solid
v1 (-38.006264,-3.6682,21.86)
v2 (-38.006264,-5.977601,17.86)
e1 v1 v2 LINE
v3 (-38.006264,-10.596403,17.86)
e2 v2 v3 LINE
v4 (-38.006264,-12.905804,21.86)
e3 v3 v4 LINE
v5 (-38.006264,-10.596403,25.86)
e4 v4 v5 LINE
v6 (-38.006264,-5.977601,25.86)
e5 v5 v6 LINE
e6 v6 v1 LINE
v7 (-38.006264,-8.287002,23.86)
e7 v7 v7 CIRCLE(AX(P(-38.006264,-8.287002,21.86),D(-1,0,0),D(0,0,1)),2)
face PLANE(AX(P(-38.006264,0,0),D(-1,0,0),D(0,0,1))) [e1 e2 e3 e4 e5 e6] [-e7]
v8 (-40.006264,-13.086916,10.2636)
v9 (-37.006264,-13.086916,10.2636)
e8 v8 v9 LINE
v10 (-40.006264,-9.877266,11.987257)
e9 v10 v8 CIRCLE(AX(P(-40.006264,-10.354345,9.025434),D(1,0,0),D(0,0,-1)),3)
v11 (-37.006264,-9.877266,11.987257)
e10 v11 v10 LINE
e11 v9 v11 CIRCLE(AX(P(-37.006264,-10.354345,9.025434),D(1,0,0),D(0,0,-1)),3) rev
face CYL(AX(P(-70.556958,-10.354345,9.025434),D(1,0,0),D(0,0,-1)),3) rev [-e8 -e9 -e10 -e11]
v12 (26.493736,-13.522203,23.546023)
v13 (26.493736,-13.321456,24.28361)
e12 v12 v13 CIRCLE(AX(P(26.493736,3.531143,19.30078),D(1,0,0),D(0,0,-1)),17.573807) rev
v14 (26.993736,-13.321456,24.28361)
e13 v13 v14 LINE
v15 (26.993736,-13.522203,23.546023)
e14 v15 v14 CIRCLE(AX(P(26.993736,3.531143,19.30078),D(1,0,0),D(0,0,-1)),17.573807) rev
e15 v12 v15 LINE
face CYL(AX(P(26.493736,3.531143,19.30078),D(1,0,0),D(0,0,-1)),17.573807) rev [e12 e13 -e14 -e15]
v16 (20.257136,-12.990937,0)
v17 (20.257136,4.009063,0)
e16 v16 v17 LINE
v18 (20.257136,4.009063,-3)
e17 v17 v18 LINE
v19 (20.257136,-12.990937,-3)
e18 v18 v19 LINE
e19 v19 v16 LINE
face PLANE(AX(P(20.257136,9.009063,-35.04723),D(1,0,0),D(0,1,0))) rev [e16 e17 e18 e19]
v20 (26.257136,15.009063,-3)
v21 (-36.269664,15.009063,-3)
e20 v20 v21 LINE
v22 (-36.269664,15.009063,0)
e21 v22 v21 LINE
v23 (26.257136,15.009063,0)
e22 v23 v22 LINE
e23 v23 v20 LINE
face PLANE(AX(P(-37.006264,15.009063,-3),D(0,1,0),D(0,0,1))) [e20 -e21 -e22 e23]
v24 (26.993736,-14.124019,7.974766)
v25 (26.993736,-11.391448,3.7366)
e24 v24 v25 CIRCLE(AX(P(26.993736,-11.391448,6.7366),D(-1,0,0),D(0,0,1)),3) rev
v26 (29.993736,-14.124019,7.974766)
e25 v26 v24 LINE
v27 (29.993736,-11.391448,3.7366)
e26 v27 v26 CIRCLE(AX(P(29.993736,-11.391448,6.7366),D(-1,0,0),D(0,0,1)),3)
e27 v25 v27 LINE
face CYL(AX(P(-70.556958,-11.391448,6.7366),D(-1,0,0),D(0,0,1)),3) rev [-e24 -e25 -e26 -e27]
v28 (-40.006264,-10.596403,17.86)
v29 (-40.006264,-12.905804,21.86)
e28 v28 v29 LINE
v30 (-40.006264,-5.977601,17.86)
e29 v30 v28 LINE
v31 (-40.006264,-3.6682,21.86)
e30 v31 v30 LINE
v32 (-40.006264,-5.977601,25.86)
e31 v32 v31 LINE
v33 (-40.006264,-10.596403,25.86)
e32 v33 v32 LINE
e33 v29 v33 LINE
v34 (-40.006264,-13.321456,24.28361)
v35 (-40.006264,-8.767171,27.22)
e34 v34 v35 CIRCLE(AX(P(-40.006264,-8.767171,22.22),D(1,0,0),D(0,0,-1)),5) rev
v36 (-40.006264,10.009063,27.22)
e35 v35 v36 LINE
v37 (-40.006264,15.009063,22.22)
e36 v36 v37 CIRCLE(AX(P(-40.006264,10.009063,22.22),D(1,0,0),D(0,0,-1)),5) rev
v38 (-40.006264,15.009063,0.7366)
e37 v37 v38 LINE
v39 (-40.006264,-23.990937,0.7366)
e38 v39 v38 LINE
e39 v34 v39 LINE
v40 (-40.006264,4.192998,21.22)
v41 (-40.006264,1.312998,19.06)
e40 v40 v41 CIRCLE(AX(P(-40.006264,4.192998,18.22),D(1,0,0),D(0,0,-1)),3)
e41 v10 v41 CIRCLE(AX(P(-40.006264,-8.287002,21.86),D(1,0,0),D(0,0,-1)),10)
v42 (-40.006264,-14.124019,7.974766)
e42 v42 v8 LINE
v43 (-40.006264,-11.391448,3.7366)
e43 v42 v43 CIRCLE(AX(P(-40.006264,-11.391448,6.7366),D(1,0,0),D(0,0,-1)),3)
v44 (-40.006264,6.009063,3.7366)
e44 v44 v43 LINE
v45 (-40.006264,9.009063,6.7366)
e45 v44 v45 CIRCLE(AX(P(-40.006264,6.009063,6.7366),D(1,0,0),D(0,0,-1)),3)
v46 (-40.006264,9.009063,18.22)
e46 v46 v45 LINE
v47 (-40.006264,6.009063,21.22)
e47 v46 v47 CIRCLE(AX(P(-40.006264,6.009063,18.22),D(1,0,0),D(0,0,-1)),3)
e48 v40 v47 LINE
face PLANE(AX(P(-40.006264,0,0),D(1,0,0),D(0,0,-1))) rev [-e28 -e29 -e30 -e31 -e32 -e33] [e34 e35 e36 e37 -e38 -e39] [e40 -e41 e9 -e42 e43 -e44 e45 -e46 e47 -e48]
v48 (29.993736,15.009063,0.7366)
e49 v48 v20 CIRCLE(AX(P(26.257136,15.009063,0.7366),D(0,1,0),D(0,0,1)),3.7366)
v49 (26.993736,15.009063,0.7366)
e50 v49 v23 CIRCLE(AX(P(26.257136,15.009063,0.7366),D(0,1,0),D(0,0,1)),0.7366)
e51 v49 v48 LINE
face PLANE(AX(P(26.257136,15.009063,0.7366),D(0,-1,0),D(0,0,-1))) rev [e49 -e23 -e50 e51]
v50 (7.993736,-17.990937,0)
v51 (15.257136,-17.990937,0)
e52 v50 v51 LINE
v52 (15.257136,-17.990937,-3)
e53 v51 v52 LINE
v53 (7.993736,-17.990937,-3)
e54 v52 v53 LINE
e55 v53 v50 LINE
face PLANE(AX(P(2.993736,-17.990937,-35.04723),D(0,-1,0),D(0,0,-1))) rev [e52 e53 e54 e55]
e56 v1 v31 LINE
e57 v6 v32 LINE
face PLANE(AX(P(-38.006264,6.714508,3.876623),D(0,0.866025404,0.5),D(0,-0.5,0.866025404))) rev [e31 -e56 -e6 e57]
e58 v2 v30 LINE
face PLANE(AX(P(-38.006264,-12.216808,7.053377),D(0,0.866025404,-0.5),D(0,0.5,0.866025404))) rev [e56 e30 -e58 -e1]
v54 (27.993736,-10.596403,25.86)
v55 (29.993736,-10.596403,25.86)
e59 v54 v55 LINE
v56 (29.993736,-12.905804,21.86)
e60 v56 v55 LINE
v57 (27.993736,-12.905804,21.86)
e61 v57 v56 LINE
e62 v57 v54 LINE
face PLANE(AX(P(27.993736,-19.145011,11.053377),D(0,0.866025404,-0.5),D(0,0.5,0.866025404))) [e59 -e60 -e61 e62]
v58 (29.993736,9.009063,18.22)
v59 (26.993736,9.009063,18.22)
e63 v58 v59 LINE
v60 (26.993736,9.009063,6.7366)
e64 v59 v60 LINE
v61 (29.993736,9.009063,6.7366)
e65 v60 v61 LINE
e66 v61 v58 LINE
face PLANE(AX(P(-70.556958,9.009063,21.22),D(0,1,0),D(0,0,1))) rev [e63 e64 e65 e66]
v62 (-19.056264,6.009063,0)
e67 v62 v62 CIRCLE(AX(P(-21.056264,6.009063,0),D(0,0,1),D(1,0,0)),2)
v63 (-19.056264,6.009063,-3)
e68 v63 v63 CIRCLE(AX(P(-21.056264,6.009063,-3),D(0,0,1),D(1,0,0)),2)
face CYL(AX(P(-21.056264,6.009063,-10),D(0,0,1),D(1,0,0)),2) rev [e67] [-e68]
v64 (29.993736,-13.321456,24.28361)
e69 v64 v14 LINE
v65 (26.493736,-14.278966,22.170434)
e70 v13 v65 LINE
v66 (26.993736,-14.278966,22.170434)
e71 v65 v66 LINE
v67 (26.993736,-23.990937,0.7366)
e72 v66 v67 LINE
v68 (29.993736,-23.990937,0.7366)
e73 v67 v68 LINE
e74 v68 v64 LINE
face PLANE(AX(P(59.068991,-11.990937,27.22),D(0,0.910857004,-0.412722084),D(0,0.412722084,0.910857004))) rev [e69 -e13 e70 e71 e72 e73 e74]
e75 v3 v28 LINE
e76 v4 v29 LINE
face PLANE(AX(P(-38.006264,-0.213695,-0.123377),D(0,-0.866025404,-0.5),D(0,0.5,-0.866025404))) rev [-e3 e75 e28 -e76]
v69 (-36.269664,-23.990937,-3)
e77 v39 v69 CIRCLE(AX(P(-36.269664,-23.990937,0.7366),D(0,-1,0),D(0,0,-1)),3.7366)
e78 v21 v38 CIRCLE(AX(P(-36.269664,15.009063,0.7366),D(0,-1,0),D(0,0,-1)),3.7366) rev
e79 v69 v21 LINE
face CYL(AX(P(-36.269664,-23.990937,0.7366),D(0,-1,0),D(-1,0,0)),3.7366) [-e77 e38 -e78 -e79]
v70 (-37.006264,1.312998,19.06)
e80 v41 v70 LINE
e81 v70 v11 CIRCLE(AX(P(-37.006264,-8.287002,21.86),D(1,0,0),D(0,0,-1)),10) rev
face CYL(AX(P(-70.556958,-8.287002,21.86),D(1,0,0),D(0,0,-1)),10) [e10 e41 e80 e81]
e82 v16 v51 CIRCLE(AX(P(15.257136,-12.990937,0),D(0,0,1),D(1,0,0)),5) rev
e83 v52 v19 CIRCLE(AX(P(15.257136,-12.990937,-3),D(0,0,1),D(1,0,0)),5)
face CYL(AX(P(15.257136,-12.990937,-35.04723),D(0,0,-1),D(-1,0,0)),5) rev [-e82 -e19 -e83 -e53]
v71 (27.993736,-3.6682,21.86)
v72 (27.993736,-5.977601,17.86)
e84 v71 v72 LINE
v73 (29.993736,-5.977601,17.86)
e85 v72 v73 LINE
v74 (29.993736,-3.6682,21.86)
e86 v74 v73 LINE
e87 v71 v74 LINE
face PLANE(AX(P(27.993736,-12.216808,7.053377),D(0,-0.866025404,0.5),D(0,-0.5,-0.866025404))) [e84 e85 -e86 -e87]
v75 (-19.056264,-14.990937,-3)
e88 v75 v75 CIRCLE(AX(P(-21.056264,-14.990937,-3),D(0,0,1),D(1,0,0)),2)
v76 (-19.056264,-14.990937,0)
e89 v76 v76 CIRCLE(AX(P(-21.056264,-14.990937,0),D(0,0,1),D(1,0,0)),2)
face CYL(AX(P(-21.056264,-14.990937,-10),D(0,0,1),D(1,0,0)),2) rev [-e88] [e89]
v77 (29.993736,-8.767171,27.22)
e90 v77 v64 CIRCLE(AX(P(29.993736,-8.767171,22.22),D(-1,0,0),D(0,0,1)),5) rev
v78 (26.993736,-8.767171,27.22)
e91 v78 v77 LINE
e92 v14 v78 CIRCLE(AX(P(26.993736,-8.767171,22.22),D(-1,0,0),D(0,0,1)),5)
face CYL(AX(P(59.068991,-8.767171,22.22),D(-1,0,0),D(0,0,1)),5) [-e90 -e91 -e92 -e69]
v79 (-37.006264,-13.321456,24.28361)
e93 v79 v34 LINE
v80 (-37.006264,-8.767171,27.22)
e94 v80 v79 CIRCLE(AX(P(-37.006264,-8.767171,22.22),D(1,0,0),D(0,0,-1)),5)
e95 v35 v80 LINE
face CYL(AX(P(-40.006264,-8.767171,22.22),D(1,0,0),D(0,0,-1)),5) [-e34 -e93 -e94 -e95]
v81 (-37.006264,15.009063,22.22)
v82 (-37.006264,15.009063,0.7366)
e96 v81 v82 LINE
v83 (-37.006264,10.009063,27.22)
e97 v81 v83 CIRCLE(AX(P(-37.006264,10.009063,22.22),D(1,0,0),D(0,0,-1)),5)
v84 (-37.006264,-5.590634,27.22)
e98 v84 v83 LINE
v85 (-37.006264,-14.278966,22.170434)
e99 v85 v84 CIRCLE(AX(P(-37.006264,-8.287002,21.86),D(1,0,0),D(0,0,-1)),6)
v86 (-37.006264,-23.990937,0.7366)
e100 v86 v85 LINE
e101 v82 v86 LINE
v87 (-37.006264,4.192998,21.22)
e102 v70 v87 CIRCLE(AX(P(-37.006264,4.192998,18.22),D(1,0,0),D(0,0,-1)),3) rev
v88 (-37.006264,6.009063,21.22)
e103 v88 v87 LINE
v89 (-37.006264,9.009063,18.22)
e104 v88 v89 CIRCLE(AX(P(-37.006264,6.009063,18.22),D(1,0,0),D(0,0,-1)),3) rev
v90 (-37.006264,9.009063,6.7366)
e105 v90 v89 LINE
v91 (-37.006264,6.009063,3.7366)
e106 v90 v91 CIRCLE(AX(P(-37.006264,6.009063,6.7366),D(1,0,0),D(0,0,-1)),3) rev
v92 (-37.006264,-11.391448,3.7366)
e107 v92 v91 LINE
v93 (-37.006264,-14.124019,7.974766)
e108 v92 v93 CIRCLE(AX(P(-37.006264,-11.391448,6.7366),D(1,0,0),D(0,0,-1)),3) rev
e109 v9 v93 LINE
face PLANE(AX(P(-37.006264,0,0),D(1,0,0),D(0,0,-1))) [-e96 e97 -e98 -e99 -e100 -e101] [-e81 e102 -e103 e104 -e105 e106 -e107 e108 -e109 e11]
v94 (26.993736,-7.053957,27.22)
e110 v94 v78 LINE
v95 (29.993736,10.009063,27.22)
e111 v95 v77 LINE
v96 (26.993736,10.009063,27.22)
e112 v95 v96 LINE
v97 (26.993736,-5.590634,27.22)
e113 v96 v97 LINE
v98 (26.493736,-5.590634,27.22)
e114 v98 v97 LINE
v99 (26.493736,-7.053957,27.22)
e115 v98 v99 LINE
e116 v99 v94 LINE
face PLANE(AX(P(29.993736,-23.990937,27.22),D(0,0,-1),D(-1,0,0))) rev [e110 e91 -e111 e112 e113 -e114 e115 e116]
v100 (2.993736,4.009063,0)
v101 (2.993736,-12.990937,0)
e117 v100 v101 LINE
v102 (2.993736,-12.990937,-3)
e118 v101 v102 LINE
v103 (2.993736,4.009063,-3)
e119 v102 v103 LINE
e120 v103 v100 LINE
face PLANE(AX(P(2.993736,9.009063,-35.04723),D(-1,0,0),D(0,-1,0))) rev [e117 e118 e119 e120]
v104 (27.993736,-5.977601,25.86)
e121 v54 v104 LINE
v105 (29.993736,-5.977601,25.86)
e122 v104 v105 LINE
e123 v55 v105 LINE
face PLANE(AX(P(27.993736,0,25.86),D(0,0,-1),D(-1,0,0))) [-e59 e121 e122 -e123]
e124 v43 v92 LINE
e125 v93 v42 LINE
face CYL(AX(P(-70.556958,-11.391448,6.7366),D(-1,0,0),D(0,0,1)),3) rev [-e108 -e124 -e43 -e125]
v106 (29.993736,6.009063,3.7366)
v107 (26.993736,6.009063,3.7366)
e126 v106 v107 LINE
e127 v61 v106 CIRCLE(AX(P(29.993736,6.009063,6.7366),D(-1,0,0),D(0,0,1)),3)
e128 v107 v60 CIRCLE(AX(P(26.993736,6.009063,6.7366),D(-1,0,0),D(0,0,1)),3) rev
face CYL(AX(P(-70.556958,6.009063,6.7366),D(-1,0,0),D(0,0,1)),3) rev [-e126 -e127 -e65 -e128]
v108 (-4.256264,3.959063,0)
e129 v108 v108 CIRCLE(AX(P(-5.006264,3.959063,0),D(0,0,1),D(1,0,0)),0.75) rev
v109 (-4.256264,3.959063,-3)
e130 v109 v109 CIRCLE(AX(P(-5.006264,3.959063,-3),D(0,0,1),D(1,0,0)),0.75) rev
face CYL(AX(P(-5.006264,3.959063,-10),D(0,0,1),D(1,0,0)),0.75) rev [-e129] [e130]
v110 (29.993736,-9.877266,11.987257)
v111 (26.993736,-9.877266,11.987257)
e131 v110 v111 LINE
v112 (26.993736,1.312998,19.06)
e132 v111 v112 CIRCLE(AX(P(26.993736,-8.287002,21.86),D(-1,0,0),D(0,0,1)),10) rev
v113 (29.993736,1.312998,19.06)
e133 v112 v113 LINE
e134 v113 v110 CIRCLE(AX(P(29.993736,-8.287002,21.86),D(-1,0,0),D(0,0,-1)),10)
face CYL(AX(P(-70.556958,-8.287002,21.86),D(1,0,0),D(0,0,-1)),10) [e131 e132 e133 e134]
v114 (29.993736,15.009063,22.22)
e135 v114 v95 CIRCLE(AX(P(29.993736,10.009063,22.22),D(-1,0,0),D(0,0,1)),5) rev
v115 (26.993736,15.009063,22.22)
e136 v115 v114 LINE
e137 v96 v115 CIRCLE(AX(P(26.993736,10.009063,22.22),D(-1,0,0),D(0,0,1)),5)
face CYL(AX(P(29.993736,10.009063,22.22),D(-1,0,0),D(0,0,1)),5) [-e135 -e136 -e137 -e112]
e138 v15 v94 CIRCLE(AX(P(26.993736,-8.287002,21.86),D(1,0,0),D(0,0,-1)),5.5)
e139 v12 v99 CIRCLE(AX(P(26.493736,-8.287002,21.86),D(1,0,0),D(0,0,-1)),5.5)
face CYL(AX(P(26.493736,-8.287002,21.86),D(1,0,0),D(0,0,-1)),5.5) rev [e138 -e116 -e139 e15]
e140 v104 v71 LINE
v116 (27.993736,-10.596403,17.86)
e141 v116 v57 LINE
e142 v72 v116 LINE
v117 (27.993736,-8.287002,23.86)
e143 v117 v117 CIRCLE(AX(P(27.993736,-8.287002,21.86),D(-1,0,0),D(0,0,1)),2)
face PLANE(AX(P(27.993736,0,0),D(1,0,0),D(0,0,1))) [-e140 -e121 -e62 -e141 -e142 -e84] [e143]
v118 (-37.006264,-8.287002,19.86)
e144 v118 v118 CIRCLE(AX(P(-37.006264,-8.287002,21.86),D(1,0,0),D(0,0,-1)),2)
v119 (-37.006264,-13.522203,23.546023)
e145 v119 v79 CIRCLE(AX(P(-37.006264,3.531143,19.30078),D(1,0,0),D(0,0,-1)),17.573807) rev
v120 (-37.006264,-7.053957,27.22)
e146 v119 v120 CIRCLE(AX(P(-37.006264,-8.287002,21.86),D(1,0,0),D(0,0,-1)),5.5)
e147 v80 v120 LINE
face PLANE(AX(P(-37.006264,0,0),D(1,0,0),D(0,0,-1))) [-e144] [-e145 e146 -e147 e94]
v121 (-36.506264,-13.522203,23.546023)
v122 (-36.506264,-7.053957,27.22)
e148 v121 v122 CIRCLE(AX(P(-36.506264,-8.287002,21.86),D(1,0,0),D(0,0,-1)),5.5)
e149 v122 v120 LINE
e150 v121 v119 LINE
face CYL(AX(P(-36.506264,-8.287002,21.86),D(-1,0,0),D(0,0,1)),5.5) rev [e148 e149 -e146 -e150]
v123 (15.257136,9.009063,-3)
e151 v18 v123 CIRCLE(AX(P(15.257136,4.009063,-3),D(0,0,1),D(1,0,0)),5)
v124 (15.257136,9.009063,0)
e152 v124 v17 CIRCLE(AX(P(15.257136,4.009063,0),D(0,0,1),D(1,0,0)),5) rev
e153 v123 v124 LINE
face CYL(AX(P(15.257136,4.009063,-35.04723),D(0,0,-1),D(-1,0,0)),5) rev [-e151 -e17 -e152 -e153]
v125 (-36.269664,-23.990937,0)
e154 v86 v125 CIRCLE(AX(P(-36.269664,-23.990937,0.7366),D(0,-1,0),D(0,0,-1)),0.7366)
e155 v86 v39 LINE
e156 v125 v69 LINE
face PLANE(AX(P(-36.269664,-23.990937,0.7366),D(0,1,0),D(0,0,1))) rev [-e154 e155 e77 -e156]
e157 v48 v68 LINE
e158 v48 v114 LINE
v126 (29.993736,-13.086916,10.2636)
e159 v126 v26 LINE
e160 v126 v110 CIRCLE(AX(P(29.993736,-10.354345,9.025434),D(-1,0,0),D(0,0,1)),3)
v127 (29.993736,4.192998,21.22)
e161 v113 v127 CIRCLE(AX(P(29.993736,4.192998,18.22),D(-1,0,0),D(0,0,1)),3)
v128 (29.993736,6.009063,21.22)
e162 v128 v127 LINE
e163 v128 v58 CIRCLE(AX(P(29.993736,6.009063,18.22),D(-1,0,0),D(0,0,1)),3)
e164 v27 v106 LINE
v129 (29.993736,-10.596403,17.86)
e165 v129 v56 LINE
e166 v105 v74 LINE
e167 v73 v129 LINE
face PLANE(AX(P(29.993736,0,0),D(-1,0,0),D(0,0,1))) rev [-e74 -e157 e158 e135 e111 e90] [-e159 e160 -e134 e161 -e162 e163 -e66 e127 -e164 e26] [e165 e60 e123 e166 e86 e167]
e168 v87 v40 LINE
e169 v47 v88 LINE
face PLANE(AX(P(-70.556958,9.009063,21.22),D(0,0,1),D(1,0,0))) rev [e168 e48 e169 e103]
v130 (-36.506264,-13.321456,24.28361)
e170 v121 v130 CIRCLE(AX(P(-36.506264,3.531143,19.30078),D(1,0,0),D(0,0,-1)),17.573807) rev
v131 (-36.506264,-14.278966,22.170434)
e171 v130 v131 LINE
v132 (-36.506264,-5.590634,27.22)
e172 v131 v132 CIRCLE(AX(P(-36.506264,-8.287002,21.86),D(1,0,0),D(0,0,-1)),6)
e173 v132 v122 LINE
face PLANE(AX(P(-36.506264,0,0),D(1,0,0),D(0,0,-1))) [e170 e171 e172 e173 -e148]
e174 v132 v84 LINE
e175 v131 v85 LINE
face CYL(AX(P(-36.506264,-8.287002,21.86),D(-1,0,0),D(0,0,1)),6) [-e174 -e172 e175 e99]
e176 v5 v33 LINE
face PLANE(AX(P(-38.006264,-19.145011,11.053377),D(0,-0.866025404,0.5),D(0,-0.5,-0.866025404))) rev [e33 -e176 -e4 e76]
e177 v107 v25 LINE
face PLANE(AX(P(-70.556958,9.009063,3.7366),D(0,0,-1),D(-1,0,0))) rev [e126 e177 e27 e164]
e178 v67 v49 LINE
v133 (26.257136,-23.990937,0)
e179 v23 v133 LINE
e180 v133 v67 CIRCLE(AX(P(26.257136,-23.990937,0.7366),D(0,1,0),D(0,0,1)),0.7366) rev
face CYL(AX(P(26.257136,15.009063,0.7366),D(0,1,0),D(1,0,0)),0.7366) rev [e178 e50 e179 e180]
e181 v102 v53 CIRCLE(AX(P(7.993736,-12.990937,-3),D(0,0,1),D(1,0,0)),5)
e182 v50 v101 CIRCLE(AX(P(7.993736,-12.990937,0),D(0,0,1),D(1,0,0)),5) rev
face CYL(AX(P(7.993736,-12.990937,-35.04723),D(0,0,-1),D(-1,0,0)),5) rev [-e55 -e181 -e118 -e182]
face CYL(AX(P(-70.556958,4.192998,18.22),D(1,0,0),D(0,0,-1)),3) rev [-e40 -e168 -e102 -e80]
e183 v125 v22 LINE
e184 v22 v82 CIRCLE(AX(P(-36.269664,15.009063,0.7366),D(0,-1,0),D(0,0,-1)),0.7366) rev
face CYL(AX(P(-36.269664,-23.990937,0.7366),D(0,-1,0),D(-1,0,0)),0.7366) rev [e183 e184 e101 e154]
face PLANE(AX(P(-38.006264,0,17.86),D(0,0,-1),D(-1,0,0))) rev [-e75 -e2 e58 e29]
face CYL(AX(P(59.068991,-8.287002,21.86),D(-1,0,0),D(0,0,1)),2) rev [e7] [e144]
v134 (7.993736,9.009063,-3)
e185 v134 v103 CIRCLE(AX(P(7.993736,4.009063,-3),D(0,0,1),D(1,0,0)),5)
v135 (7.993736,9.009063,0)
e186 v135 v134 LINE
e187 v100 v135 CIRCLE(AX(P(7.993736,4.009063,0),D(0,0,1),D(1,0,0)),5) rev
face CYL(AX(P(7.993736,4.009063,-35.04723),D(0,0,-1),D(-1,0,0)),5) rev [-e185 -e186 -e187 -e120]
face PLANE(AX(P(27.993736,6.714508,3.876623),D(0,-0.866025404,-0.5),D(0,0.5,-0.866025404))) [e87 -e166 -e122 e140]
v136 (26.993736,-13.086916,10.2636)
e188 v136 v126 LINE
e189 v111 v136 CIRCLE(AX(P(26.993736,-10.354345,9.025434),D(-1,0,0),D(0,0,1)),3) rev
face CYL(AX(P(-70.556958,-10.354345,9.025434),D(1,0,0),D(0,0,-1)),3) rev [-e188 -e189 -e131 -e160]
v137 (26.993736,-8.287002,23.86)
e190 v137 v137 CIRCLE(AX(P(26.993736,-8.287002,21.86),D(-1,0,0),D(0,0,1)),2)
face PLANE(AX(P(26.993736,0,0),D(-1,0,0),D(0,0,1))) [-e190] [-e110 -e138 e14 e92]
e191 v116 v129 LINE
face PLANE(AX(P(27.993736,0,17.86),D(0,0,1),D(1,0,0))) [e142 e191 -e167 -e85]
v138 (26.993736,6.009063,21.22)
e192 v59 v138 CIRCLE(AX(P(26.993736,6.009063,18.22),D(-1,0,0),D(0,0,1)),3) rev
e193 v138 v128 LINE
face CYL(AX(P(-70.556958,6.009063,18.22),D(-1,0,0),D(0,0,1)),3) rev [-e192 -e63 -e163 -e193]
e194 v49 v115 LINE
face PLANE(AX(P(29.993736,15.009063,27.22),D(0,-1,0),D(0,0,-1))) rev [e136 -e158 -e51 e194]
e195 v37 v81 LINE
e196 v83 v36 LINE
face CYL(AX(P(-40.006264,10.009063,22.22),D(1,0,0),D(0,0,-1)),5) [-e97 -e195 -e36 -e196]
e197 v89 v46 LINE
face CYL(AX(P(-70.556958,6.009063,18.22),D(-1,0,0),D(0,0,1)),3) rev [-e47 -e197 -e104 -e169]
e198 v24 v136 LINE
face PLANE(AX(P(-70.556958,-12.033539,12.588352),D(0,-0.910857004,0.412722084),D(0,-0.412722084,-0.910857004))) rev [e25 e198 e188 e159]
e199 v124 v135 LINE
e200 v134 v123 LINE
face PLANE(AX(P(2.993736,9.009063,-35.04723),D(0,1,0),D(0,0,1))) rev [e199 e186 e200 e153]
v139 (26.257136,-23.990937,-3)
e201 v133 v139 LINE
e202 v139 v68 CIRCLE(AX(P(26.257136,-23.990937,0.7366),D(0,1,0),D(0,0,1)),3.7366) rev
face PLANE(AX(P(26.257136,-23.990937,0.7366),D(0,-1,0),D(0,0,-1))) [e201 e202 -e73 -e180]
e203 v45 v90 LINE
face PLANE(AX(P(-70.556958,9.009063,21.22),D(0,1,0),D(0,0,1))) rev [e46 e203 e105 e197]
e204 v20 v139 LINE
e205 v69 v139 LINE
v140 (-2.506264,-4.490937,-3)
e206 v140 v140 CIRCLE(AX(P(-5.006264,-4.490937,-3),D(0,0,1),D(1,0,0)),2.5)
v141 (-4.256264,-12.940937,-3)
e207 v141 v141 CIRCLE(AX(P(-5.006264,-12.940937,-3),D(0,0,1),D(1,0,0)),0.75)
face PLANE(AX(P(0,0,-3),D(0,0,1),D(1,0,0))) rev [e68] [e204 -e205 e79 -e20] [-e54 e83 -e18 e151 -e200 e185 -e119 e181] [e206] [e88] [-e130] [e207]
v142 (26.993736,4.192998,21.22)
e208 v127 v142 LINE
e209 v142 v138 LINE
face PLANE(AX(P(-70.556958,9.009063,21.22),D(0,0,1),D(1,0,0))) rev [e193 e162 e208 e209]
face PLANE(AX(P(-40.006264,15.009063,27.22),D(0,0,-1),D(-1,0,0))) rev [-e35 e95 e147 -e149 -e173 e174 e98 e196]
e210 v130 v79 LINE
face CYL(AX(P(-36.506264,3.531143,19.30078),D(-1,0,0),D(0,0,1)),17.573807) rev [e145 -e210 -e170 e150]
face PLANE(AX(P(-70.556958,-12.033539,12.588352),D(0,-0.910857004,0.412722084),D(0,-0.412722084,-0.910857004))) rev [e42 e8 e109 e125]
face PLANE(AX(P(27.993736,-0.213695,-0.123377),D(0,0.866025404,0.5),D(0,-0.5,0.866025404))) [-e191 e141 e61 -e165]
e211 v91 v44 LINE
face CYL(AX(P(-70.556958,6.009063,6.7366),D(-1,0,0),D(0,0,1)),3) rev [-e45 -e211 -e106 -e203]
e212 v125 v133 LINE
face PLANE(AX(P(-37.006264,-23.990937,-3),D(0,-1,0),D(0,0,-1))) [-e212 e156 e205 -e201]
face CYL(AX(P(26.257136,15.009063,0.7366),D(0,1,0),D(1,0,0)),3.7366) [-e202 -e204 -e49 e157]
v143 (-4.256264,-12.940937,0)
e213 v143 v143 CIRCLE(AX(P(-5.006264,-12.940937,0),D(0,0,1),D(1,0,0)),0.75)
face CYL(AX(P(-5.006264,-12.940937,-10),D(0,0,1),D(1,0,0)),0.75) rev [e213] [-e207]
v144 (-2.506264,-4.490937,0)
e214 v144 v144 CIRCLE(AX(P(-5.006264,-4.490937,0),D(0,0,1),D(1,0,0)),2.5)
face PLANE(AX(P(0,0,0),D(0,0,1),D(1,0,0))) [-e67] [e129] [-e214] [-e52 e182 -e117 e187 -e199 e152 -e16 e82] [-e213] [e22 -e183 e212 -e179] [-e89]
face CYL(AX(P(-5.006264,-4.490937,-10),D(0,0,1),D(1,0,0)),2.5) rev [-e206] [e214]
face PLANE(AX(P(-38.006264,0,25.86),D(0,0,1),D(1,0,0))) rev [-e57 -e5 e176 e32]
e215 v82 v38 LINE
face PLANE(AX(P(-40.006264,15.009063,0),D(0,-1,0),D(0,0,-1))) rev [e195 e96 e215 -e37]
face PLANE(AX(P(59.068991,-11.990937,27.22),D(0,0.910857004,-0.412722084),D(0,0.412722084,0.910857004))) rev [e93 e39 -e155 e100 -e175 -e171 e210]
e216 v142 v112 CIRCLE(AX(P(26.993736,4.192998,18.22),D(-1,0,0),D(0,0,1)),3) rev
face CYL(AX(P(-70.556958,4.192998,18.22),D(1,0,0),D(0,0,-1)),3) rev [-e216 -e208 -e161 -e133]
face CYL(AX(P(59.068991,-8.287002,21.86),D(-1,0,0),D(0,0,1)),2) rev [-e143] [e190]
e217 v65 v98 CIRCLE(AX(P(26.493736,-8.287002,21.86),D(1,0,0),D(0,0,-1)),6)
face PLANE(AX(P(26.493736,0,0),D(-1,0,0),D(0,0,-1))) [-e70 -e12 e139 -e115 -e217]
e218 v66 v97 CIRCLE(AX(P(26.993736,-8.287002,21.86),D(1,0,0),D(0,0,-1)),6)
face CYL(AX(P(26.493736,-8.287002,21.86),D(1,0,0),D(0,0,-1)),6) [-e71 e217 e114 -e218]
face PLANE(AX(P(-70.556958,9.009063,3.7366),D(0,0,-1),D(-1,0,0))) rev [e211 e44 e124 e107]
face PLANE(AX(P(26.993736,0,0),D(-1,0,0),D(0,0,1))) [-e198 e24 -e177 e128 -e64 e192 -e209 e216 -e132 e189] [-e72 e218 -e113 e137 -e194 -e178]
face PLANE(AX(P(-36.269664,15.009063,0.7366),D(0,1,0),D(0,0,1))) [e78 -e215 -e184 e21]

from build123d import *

# Parameters (mm, degrees)
ESBO_O1_W                        = 64
ESBO_O1_H                        = 39
FLANGE_BASE1_DEPTH               = 3
ESBO_O6_R                        = 2
ESBO_O6_R_2                      = 2.5
ESBO_O6_R_3                      = 0.75
CORTE_EXTRUS_O1_DEPTH            = 10
ARESTA_FLANGE1_STRIP_W           = 13.4732
ARESTA_FLANGE1_STRIP_H           = 3
ARESTA_FLANGE1_STRIP_CUT_DEPTH   = 39
ARESTA_FLANGE1_STRIP_2_W         = 13.4732
ARESTA_FLANGE1_STRIP_2_H         = 3
ARESTA_FLANGE1_STRIP_CUT_2_DEPTH = 39
ARESTA_FLANGE1_DEPTH             = 39
ARESTA_FLANGE1_BEND_DEPTH        = 39
CORTE_EXTRUS_O2_REACH            = 80.845
ESBO_O13_R                       = 2
FILETE1_R                        = 5
ESBO_O13_3_R                     = 2
CUT_EXTRUDE1_DEPTH               = 2
BOSS_EXTRUDE1_DEPTH              = 0.5
SKETCH15_W                       = 17.2634
SKETCH15_H                       = 27
CUT_EXTRUDE2_DEPTH               = 3
FILLET1_R                        = 5
CUT_EXTRUDE3_START               = -70
CUT_EXTRUDE3_DEPTH               = 70
FILLET2_R                        = 3


# Sheet-metal steps are written as plain solids
with BuildPart() as part:
    # Esboço1 → Flange-base1 (new body)
    with BuildSketch(Plane.XY):
        with Locations((-5.006264217, -4.490936556)):
            Rectangle(ESBO_O1_W, ESBO_O1_H)
    extrude(amount=-FLANGE_BASE1_DEPTH)

    # Esboço6 → Corte-extrusão1 (cut)
    with BuildSketch(Plane.XY):
        with Locations((-21.056264217, 6.009063444)):
            Circle(ESBO_O6_R)
        with Locations((-21.056264217, -14.990936556)):
            Circle(ESBO_O6_R)
        with Locations((-5.006264217, -4.490936556)):
            Circle(ESBO_O6_R_2)
        with Locations((-5.006264217, -12.940936556)):
            Circle(ESBO_O6_R_3)
        with Locations((-5.006264217, 3.959063444)):
            Circle(ESBO_O6_R_3)
    extrude(amount=-CORTE_EXTRUS_O1_DEPTH, mode=Mode.SUBTRACT)

    # Aresta-Flange1 strip (across the edge) → Aresta-Flange1 strip cut (cut)
    with BuildSketch(Plane(origin=(26.993735783, -23.990936556, 0), x_dir=(-1, 0, 0), z_dir=(0, 1, 0))):
        with Locations((-6, -1.5)):
            Rectangle(ARESTA_FLANGE1_STRIP_W, ARESTA_FLANGE1_STRIP_H)
    extrude(amount=ARESTA_FLANGE1_STRIP_CUT_DEPTH, mode=Mode.SUBTRACT)

    # Aresta-Flange1 strip 2 (across the edge) → Aresta-Flange1 strip cut 2 (cut)
    with BuildSketch(Plane(origin=(-37.006264217, 15.009063444, 0), x_dir=(1, 0, 0), z_dir=(0, -1, 0))):
        with Locations((-6, -1.5)):
            Rectangle(ARESTA_FLANGE1_STRIP_2_W, ARESTA_FLANGE1_STRIP_2_H)
    extrude(amount=ARESTA_FLANGE1_STRIP_CUT_2_DEPTH, mode=Mode.SUBTRACT)

    # Aresta-Flange1 section (across the edge) → Aresta-Flange1 (add)
    with BuildSketch(Plane(origin=(26.993735783, -23.990936556, 0), x_dir=(-1, 0, 0), z_dir=(0, 1, 0))):
        with BuildLine():
            Line((-3, 0.7366), (-3, 27.22))
            Line((-3, 27.22), (0, 27.22))
            Line((0, 27.22), (0, 0.7366))
            ThreePointArc((0, 0.7366), (0.215745145, 0.215745145), (0.7366, 0))
            Line((0.7366, 0), (0.7366, -3))
            ThreePointArc((0.7366, -3), (-1.905575199, -1.905575199), (-3, 0.7366))
        make_face()
    extrude(amount=ARESTA_FLANGE1_DEPTH)

    # Aresta-Flange1 section 2 (across the edge) → Aresta-Flange1 bend (add)
    with BuildSketch(Plane(origin=(-37.006264217, 15.009063444, 0), x_dir=(1, 0, 0), z_dir=(0, -1, 0))):
        with BuildLine():
            Line((-3, 0.7366), (-3, 27.22))
            Line((-3, 27.22), (0, 27.22))
            Line((0, 27.22), (0, 0.7366))
            ThreePointArc((0, 0.7366), (0.215745145, 0.215745145), (0.7366, 0))
            Line((0.7366, 0), (0.7366, -3))
            ThreePointArc((0.7366, -3), (-1.905575199, -1.905575199), (-3, 0.7366))
        make_face()
    extrude(amount=ARESTA_FLANGE1_BEND_DEPTH)

    # Corte-extrusão2: up to this face of the body (flat: up to its plane)
    corte_extrus_o2_end = Plane(part.part.faces().sort_by_distance((29.993735783, -4.490936556, 13.9783))[0])
    # Esboço13 → Corte-extrusão2 (cut, up to the picked face)
    with BuildSketch(Plane.ZY.offset(40.006264217), mode=Mode.PRIVATE) as corte_extrus_o2_sk1:
        with Locations((21.86, -8.287001978)):
            Circle(ESBO_O13_R)
    corte_extrus_o2_tool1 = split(extrude(corte_extrus_o2_sk1.sketch, amount=-CORTE_EXTRUS_O2_REACH, mode=Mode.PRIVATE), bisect_by=corte_extrus_o2_end, keep=Keep.BOTH, mode=Mode.PRIVATE)
    # Esboço13 → Corte-extrusão2 (cut, up to the picked face)
    with BuildSketch(Plane.ZY.offset(40.006264217), mode=Mode.PRIVATE) as corte_extrus_o2_sk2:
        Polygon((27.22, -11.990936556), (0.7366, -23.990936556), (27.22, -23.990936556), align=None)
    corte_extrus_o2_tool2 = split(extrude(corte_extrus_o2_sk2.sketch, amount=-CORTE_EXTRUS_O2_REACH, mode=Mode.PRIVATE), bisect_by=corte_extrus_o2_end, keep=Keep.BOTH, mode=Mode.PRIVATE)
    add(corte_extrus_o2_tool1.solids().sort_by(Axis((-40.006264, -8.287002, 21.86), (1, 0, 0)))[0], mode=Mode.SUBTRACT)
    add(corte_extrus_o2_tool2.solids().sort_by(Axis((-40.006264, -19.990937, 18.3922), (1, 0, 0)))[0], mode=Mode.SUBTRACT)

    # Filete1
    filete1_edges = [part.edges().sort_by_distance(p)[0] for p in [
        (-38.506264217, -11.990936556, 27.22),
        (28.493735783, -11.990936556, 27.22),
        (28.493735783, 15.009063444, 27.22),
        (-38.506264217, 15.009063444, 27.22),
    ]]
    fillet(filete1_edges, radius=FILETE1_R)

    # Esboço13<3> → Cut-Extrude1 (cut)
    with BuildSketch(Plane.ZY.offset(40.006264217)):
        Polygon((21.86, -3.668199824), (17.86, -5.977600901), (17.86, -10.596403054), (21.86, -12.905804131), (25.86, -10.596403054), (25.86, -5.977600901), align=None)
        with Locations((21.86, -8.287001978)):
            Circle(ESBO_O13_3_R, mode=Mode.SUBTRACT)
    cut_extrude1 = extrude(amount=-CUT_EXTRUDE1_DEPTH, mode=Mode.SUBTRACT)

    # Sketch7 → Boss-Extrude1 (add)
    with BuildSketch(Plane(origin=(-37.006264217, 0, 0), x_dir=(0, 0, -1), z_dir=(1, 0, 0))):
        with BuildLine():
            ThreePointArc((-23.546022833, -13.522202738), (-23.915908256, -13.425840182), (-24.283610421, -13.32145586))
            Line((-24.283610421, -13.32145586), (-22.170433783, -14.278965835))
            ThreePointArc((-22.170433783, -14.278965835), (-16.672492687, -5.272077786), (-27.22, -5.59063405))
            Line((-27.22, -5.59063405), (-27.22, -7.053956966))
            ThreePointArc((-27.22, -7.053956966), (-17.36732716, -5.11432318), (-22.490825712, -13.750705751))
            ThreePointArc((-22.490825712, -13.750705751), (-23.024044759, -13.66240892), (-23.546022833, -13.522202738))
        make_face()
    boss_extrude1 = extrude(amount=BOSS_EXTRUDE1_DEPTH)

    # Mirror1: Cut-Extrude1, Boss-Extrude1 across plane
    add(cut_extrude1.mirror(Plane.ZY.offset(5.006264217)), mode=Mode.SUBTRACT)
    add(boss_extrude1.mirror(Plane.ZY.offset(5.006264217)))

    # Sketch15 → Cut-Extrude2 (cut)
    with BuildSketch(Plane.XY):
        with Locations((11.625435783, -4.490936556)):
            Rectangle(SKETCH15_W, SKETCH15_H)
    extrude(amount=-CUT_EXTRUDE2_DEPTH, mode=Mode.SUBTRACT)

    # Fillet1
    fillet1_edges = [part.edges().sort_by_distance(p)[0] for p in [
        (2.993735783, -17.990936556, -1.5),
        (2.993735783, 9.009063444, -1.5),
        (20.257135783, 9.009063444, -1.5),
        (20.257135783, -17.990936556, -1.5),
    ]]
    fillet(fillet1_edges, radius=FILLET1_R)

    # Sketch16 → Cut-Extrude3 (cut)
    with BuildSketch(Plane(origin=(29.993735783, 0, 0), x_dir=(0, 0, -1), z_dir=(1, 0, 0)).offset(CUT_EXTRUDE3_START)):
        with BuildLine():
            Line((-21.22, 9.009063444), (-3.7366, 9.009063444))
            Line((-3.7366, 9.009063444), (-3.7366, -16.044391464))
            Line((-3.7366, -16.044391464), (-12.588351652, -12.033538634))
            ThreePointArc((-12.588351652, -12.033538634), (-13.394705743, -2.963582668), (-21.22, 1.692497008))
            Line((-21.22, 1.692497008), (-21.22, 9.009063444))
        make_face()
    extrude(amount=CUT_EXTRUDE3_DEPTH, mode=Mode.SUBTRACT)

    # Fillet2
    fillet2_edges = [part.edges().sort_by_distance(p)[0] for p in [
        (28.493735783, 1.692497008, 21.22),
        (28.493735783, 9.009063444, 21.22),
        (28.493735783, 9.009063444, 3.7366),
        (28.493735783, -16.044391464, 3.7366),
        (28.493735783, -12.033538634, 12.588351652),
        (-38.506264217, 1.692497008, 21.22),
        (-38.506264217, 9.009063444, 21.22),
        (-38.506264217, 9.009063444, 3.7366),
        (-38.506264217, -16.044391464, 3.7366),
        (-38.506264217, -12.033538634, 12.588351652),
    ]]
    fillet(fillet2_edges, radius=FILLET2_R)


solid = part.part
